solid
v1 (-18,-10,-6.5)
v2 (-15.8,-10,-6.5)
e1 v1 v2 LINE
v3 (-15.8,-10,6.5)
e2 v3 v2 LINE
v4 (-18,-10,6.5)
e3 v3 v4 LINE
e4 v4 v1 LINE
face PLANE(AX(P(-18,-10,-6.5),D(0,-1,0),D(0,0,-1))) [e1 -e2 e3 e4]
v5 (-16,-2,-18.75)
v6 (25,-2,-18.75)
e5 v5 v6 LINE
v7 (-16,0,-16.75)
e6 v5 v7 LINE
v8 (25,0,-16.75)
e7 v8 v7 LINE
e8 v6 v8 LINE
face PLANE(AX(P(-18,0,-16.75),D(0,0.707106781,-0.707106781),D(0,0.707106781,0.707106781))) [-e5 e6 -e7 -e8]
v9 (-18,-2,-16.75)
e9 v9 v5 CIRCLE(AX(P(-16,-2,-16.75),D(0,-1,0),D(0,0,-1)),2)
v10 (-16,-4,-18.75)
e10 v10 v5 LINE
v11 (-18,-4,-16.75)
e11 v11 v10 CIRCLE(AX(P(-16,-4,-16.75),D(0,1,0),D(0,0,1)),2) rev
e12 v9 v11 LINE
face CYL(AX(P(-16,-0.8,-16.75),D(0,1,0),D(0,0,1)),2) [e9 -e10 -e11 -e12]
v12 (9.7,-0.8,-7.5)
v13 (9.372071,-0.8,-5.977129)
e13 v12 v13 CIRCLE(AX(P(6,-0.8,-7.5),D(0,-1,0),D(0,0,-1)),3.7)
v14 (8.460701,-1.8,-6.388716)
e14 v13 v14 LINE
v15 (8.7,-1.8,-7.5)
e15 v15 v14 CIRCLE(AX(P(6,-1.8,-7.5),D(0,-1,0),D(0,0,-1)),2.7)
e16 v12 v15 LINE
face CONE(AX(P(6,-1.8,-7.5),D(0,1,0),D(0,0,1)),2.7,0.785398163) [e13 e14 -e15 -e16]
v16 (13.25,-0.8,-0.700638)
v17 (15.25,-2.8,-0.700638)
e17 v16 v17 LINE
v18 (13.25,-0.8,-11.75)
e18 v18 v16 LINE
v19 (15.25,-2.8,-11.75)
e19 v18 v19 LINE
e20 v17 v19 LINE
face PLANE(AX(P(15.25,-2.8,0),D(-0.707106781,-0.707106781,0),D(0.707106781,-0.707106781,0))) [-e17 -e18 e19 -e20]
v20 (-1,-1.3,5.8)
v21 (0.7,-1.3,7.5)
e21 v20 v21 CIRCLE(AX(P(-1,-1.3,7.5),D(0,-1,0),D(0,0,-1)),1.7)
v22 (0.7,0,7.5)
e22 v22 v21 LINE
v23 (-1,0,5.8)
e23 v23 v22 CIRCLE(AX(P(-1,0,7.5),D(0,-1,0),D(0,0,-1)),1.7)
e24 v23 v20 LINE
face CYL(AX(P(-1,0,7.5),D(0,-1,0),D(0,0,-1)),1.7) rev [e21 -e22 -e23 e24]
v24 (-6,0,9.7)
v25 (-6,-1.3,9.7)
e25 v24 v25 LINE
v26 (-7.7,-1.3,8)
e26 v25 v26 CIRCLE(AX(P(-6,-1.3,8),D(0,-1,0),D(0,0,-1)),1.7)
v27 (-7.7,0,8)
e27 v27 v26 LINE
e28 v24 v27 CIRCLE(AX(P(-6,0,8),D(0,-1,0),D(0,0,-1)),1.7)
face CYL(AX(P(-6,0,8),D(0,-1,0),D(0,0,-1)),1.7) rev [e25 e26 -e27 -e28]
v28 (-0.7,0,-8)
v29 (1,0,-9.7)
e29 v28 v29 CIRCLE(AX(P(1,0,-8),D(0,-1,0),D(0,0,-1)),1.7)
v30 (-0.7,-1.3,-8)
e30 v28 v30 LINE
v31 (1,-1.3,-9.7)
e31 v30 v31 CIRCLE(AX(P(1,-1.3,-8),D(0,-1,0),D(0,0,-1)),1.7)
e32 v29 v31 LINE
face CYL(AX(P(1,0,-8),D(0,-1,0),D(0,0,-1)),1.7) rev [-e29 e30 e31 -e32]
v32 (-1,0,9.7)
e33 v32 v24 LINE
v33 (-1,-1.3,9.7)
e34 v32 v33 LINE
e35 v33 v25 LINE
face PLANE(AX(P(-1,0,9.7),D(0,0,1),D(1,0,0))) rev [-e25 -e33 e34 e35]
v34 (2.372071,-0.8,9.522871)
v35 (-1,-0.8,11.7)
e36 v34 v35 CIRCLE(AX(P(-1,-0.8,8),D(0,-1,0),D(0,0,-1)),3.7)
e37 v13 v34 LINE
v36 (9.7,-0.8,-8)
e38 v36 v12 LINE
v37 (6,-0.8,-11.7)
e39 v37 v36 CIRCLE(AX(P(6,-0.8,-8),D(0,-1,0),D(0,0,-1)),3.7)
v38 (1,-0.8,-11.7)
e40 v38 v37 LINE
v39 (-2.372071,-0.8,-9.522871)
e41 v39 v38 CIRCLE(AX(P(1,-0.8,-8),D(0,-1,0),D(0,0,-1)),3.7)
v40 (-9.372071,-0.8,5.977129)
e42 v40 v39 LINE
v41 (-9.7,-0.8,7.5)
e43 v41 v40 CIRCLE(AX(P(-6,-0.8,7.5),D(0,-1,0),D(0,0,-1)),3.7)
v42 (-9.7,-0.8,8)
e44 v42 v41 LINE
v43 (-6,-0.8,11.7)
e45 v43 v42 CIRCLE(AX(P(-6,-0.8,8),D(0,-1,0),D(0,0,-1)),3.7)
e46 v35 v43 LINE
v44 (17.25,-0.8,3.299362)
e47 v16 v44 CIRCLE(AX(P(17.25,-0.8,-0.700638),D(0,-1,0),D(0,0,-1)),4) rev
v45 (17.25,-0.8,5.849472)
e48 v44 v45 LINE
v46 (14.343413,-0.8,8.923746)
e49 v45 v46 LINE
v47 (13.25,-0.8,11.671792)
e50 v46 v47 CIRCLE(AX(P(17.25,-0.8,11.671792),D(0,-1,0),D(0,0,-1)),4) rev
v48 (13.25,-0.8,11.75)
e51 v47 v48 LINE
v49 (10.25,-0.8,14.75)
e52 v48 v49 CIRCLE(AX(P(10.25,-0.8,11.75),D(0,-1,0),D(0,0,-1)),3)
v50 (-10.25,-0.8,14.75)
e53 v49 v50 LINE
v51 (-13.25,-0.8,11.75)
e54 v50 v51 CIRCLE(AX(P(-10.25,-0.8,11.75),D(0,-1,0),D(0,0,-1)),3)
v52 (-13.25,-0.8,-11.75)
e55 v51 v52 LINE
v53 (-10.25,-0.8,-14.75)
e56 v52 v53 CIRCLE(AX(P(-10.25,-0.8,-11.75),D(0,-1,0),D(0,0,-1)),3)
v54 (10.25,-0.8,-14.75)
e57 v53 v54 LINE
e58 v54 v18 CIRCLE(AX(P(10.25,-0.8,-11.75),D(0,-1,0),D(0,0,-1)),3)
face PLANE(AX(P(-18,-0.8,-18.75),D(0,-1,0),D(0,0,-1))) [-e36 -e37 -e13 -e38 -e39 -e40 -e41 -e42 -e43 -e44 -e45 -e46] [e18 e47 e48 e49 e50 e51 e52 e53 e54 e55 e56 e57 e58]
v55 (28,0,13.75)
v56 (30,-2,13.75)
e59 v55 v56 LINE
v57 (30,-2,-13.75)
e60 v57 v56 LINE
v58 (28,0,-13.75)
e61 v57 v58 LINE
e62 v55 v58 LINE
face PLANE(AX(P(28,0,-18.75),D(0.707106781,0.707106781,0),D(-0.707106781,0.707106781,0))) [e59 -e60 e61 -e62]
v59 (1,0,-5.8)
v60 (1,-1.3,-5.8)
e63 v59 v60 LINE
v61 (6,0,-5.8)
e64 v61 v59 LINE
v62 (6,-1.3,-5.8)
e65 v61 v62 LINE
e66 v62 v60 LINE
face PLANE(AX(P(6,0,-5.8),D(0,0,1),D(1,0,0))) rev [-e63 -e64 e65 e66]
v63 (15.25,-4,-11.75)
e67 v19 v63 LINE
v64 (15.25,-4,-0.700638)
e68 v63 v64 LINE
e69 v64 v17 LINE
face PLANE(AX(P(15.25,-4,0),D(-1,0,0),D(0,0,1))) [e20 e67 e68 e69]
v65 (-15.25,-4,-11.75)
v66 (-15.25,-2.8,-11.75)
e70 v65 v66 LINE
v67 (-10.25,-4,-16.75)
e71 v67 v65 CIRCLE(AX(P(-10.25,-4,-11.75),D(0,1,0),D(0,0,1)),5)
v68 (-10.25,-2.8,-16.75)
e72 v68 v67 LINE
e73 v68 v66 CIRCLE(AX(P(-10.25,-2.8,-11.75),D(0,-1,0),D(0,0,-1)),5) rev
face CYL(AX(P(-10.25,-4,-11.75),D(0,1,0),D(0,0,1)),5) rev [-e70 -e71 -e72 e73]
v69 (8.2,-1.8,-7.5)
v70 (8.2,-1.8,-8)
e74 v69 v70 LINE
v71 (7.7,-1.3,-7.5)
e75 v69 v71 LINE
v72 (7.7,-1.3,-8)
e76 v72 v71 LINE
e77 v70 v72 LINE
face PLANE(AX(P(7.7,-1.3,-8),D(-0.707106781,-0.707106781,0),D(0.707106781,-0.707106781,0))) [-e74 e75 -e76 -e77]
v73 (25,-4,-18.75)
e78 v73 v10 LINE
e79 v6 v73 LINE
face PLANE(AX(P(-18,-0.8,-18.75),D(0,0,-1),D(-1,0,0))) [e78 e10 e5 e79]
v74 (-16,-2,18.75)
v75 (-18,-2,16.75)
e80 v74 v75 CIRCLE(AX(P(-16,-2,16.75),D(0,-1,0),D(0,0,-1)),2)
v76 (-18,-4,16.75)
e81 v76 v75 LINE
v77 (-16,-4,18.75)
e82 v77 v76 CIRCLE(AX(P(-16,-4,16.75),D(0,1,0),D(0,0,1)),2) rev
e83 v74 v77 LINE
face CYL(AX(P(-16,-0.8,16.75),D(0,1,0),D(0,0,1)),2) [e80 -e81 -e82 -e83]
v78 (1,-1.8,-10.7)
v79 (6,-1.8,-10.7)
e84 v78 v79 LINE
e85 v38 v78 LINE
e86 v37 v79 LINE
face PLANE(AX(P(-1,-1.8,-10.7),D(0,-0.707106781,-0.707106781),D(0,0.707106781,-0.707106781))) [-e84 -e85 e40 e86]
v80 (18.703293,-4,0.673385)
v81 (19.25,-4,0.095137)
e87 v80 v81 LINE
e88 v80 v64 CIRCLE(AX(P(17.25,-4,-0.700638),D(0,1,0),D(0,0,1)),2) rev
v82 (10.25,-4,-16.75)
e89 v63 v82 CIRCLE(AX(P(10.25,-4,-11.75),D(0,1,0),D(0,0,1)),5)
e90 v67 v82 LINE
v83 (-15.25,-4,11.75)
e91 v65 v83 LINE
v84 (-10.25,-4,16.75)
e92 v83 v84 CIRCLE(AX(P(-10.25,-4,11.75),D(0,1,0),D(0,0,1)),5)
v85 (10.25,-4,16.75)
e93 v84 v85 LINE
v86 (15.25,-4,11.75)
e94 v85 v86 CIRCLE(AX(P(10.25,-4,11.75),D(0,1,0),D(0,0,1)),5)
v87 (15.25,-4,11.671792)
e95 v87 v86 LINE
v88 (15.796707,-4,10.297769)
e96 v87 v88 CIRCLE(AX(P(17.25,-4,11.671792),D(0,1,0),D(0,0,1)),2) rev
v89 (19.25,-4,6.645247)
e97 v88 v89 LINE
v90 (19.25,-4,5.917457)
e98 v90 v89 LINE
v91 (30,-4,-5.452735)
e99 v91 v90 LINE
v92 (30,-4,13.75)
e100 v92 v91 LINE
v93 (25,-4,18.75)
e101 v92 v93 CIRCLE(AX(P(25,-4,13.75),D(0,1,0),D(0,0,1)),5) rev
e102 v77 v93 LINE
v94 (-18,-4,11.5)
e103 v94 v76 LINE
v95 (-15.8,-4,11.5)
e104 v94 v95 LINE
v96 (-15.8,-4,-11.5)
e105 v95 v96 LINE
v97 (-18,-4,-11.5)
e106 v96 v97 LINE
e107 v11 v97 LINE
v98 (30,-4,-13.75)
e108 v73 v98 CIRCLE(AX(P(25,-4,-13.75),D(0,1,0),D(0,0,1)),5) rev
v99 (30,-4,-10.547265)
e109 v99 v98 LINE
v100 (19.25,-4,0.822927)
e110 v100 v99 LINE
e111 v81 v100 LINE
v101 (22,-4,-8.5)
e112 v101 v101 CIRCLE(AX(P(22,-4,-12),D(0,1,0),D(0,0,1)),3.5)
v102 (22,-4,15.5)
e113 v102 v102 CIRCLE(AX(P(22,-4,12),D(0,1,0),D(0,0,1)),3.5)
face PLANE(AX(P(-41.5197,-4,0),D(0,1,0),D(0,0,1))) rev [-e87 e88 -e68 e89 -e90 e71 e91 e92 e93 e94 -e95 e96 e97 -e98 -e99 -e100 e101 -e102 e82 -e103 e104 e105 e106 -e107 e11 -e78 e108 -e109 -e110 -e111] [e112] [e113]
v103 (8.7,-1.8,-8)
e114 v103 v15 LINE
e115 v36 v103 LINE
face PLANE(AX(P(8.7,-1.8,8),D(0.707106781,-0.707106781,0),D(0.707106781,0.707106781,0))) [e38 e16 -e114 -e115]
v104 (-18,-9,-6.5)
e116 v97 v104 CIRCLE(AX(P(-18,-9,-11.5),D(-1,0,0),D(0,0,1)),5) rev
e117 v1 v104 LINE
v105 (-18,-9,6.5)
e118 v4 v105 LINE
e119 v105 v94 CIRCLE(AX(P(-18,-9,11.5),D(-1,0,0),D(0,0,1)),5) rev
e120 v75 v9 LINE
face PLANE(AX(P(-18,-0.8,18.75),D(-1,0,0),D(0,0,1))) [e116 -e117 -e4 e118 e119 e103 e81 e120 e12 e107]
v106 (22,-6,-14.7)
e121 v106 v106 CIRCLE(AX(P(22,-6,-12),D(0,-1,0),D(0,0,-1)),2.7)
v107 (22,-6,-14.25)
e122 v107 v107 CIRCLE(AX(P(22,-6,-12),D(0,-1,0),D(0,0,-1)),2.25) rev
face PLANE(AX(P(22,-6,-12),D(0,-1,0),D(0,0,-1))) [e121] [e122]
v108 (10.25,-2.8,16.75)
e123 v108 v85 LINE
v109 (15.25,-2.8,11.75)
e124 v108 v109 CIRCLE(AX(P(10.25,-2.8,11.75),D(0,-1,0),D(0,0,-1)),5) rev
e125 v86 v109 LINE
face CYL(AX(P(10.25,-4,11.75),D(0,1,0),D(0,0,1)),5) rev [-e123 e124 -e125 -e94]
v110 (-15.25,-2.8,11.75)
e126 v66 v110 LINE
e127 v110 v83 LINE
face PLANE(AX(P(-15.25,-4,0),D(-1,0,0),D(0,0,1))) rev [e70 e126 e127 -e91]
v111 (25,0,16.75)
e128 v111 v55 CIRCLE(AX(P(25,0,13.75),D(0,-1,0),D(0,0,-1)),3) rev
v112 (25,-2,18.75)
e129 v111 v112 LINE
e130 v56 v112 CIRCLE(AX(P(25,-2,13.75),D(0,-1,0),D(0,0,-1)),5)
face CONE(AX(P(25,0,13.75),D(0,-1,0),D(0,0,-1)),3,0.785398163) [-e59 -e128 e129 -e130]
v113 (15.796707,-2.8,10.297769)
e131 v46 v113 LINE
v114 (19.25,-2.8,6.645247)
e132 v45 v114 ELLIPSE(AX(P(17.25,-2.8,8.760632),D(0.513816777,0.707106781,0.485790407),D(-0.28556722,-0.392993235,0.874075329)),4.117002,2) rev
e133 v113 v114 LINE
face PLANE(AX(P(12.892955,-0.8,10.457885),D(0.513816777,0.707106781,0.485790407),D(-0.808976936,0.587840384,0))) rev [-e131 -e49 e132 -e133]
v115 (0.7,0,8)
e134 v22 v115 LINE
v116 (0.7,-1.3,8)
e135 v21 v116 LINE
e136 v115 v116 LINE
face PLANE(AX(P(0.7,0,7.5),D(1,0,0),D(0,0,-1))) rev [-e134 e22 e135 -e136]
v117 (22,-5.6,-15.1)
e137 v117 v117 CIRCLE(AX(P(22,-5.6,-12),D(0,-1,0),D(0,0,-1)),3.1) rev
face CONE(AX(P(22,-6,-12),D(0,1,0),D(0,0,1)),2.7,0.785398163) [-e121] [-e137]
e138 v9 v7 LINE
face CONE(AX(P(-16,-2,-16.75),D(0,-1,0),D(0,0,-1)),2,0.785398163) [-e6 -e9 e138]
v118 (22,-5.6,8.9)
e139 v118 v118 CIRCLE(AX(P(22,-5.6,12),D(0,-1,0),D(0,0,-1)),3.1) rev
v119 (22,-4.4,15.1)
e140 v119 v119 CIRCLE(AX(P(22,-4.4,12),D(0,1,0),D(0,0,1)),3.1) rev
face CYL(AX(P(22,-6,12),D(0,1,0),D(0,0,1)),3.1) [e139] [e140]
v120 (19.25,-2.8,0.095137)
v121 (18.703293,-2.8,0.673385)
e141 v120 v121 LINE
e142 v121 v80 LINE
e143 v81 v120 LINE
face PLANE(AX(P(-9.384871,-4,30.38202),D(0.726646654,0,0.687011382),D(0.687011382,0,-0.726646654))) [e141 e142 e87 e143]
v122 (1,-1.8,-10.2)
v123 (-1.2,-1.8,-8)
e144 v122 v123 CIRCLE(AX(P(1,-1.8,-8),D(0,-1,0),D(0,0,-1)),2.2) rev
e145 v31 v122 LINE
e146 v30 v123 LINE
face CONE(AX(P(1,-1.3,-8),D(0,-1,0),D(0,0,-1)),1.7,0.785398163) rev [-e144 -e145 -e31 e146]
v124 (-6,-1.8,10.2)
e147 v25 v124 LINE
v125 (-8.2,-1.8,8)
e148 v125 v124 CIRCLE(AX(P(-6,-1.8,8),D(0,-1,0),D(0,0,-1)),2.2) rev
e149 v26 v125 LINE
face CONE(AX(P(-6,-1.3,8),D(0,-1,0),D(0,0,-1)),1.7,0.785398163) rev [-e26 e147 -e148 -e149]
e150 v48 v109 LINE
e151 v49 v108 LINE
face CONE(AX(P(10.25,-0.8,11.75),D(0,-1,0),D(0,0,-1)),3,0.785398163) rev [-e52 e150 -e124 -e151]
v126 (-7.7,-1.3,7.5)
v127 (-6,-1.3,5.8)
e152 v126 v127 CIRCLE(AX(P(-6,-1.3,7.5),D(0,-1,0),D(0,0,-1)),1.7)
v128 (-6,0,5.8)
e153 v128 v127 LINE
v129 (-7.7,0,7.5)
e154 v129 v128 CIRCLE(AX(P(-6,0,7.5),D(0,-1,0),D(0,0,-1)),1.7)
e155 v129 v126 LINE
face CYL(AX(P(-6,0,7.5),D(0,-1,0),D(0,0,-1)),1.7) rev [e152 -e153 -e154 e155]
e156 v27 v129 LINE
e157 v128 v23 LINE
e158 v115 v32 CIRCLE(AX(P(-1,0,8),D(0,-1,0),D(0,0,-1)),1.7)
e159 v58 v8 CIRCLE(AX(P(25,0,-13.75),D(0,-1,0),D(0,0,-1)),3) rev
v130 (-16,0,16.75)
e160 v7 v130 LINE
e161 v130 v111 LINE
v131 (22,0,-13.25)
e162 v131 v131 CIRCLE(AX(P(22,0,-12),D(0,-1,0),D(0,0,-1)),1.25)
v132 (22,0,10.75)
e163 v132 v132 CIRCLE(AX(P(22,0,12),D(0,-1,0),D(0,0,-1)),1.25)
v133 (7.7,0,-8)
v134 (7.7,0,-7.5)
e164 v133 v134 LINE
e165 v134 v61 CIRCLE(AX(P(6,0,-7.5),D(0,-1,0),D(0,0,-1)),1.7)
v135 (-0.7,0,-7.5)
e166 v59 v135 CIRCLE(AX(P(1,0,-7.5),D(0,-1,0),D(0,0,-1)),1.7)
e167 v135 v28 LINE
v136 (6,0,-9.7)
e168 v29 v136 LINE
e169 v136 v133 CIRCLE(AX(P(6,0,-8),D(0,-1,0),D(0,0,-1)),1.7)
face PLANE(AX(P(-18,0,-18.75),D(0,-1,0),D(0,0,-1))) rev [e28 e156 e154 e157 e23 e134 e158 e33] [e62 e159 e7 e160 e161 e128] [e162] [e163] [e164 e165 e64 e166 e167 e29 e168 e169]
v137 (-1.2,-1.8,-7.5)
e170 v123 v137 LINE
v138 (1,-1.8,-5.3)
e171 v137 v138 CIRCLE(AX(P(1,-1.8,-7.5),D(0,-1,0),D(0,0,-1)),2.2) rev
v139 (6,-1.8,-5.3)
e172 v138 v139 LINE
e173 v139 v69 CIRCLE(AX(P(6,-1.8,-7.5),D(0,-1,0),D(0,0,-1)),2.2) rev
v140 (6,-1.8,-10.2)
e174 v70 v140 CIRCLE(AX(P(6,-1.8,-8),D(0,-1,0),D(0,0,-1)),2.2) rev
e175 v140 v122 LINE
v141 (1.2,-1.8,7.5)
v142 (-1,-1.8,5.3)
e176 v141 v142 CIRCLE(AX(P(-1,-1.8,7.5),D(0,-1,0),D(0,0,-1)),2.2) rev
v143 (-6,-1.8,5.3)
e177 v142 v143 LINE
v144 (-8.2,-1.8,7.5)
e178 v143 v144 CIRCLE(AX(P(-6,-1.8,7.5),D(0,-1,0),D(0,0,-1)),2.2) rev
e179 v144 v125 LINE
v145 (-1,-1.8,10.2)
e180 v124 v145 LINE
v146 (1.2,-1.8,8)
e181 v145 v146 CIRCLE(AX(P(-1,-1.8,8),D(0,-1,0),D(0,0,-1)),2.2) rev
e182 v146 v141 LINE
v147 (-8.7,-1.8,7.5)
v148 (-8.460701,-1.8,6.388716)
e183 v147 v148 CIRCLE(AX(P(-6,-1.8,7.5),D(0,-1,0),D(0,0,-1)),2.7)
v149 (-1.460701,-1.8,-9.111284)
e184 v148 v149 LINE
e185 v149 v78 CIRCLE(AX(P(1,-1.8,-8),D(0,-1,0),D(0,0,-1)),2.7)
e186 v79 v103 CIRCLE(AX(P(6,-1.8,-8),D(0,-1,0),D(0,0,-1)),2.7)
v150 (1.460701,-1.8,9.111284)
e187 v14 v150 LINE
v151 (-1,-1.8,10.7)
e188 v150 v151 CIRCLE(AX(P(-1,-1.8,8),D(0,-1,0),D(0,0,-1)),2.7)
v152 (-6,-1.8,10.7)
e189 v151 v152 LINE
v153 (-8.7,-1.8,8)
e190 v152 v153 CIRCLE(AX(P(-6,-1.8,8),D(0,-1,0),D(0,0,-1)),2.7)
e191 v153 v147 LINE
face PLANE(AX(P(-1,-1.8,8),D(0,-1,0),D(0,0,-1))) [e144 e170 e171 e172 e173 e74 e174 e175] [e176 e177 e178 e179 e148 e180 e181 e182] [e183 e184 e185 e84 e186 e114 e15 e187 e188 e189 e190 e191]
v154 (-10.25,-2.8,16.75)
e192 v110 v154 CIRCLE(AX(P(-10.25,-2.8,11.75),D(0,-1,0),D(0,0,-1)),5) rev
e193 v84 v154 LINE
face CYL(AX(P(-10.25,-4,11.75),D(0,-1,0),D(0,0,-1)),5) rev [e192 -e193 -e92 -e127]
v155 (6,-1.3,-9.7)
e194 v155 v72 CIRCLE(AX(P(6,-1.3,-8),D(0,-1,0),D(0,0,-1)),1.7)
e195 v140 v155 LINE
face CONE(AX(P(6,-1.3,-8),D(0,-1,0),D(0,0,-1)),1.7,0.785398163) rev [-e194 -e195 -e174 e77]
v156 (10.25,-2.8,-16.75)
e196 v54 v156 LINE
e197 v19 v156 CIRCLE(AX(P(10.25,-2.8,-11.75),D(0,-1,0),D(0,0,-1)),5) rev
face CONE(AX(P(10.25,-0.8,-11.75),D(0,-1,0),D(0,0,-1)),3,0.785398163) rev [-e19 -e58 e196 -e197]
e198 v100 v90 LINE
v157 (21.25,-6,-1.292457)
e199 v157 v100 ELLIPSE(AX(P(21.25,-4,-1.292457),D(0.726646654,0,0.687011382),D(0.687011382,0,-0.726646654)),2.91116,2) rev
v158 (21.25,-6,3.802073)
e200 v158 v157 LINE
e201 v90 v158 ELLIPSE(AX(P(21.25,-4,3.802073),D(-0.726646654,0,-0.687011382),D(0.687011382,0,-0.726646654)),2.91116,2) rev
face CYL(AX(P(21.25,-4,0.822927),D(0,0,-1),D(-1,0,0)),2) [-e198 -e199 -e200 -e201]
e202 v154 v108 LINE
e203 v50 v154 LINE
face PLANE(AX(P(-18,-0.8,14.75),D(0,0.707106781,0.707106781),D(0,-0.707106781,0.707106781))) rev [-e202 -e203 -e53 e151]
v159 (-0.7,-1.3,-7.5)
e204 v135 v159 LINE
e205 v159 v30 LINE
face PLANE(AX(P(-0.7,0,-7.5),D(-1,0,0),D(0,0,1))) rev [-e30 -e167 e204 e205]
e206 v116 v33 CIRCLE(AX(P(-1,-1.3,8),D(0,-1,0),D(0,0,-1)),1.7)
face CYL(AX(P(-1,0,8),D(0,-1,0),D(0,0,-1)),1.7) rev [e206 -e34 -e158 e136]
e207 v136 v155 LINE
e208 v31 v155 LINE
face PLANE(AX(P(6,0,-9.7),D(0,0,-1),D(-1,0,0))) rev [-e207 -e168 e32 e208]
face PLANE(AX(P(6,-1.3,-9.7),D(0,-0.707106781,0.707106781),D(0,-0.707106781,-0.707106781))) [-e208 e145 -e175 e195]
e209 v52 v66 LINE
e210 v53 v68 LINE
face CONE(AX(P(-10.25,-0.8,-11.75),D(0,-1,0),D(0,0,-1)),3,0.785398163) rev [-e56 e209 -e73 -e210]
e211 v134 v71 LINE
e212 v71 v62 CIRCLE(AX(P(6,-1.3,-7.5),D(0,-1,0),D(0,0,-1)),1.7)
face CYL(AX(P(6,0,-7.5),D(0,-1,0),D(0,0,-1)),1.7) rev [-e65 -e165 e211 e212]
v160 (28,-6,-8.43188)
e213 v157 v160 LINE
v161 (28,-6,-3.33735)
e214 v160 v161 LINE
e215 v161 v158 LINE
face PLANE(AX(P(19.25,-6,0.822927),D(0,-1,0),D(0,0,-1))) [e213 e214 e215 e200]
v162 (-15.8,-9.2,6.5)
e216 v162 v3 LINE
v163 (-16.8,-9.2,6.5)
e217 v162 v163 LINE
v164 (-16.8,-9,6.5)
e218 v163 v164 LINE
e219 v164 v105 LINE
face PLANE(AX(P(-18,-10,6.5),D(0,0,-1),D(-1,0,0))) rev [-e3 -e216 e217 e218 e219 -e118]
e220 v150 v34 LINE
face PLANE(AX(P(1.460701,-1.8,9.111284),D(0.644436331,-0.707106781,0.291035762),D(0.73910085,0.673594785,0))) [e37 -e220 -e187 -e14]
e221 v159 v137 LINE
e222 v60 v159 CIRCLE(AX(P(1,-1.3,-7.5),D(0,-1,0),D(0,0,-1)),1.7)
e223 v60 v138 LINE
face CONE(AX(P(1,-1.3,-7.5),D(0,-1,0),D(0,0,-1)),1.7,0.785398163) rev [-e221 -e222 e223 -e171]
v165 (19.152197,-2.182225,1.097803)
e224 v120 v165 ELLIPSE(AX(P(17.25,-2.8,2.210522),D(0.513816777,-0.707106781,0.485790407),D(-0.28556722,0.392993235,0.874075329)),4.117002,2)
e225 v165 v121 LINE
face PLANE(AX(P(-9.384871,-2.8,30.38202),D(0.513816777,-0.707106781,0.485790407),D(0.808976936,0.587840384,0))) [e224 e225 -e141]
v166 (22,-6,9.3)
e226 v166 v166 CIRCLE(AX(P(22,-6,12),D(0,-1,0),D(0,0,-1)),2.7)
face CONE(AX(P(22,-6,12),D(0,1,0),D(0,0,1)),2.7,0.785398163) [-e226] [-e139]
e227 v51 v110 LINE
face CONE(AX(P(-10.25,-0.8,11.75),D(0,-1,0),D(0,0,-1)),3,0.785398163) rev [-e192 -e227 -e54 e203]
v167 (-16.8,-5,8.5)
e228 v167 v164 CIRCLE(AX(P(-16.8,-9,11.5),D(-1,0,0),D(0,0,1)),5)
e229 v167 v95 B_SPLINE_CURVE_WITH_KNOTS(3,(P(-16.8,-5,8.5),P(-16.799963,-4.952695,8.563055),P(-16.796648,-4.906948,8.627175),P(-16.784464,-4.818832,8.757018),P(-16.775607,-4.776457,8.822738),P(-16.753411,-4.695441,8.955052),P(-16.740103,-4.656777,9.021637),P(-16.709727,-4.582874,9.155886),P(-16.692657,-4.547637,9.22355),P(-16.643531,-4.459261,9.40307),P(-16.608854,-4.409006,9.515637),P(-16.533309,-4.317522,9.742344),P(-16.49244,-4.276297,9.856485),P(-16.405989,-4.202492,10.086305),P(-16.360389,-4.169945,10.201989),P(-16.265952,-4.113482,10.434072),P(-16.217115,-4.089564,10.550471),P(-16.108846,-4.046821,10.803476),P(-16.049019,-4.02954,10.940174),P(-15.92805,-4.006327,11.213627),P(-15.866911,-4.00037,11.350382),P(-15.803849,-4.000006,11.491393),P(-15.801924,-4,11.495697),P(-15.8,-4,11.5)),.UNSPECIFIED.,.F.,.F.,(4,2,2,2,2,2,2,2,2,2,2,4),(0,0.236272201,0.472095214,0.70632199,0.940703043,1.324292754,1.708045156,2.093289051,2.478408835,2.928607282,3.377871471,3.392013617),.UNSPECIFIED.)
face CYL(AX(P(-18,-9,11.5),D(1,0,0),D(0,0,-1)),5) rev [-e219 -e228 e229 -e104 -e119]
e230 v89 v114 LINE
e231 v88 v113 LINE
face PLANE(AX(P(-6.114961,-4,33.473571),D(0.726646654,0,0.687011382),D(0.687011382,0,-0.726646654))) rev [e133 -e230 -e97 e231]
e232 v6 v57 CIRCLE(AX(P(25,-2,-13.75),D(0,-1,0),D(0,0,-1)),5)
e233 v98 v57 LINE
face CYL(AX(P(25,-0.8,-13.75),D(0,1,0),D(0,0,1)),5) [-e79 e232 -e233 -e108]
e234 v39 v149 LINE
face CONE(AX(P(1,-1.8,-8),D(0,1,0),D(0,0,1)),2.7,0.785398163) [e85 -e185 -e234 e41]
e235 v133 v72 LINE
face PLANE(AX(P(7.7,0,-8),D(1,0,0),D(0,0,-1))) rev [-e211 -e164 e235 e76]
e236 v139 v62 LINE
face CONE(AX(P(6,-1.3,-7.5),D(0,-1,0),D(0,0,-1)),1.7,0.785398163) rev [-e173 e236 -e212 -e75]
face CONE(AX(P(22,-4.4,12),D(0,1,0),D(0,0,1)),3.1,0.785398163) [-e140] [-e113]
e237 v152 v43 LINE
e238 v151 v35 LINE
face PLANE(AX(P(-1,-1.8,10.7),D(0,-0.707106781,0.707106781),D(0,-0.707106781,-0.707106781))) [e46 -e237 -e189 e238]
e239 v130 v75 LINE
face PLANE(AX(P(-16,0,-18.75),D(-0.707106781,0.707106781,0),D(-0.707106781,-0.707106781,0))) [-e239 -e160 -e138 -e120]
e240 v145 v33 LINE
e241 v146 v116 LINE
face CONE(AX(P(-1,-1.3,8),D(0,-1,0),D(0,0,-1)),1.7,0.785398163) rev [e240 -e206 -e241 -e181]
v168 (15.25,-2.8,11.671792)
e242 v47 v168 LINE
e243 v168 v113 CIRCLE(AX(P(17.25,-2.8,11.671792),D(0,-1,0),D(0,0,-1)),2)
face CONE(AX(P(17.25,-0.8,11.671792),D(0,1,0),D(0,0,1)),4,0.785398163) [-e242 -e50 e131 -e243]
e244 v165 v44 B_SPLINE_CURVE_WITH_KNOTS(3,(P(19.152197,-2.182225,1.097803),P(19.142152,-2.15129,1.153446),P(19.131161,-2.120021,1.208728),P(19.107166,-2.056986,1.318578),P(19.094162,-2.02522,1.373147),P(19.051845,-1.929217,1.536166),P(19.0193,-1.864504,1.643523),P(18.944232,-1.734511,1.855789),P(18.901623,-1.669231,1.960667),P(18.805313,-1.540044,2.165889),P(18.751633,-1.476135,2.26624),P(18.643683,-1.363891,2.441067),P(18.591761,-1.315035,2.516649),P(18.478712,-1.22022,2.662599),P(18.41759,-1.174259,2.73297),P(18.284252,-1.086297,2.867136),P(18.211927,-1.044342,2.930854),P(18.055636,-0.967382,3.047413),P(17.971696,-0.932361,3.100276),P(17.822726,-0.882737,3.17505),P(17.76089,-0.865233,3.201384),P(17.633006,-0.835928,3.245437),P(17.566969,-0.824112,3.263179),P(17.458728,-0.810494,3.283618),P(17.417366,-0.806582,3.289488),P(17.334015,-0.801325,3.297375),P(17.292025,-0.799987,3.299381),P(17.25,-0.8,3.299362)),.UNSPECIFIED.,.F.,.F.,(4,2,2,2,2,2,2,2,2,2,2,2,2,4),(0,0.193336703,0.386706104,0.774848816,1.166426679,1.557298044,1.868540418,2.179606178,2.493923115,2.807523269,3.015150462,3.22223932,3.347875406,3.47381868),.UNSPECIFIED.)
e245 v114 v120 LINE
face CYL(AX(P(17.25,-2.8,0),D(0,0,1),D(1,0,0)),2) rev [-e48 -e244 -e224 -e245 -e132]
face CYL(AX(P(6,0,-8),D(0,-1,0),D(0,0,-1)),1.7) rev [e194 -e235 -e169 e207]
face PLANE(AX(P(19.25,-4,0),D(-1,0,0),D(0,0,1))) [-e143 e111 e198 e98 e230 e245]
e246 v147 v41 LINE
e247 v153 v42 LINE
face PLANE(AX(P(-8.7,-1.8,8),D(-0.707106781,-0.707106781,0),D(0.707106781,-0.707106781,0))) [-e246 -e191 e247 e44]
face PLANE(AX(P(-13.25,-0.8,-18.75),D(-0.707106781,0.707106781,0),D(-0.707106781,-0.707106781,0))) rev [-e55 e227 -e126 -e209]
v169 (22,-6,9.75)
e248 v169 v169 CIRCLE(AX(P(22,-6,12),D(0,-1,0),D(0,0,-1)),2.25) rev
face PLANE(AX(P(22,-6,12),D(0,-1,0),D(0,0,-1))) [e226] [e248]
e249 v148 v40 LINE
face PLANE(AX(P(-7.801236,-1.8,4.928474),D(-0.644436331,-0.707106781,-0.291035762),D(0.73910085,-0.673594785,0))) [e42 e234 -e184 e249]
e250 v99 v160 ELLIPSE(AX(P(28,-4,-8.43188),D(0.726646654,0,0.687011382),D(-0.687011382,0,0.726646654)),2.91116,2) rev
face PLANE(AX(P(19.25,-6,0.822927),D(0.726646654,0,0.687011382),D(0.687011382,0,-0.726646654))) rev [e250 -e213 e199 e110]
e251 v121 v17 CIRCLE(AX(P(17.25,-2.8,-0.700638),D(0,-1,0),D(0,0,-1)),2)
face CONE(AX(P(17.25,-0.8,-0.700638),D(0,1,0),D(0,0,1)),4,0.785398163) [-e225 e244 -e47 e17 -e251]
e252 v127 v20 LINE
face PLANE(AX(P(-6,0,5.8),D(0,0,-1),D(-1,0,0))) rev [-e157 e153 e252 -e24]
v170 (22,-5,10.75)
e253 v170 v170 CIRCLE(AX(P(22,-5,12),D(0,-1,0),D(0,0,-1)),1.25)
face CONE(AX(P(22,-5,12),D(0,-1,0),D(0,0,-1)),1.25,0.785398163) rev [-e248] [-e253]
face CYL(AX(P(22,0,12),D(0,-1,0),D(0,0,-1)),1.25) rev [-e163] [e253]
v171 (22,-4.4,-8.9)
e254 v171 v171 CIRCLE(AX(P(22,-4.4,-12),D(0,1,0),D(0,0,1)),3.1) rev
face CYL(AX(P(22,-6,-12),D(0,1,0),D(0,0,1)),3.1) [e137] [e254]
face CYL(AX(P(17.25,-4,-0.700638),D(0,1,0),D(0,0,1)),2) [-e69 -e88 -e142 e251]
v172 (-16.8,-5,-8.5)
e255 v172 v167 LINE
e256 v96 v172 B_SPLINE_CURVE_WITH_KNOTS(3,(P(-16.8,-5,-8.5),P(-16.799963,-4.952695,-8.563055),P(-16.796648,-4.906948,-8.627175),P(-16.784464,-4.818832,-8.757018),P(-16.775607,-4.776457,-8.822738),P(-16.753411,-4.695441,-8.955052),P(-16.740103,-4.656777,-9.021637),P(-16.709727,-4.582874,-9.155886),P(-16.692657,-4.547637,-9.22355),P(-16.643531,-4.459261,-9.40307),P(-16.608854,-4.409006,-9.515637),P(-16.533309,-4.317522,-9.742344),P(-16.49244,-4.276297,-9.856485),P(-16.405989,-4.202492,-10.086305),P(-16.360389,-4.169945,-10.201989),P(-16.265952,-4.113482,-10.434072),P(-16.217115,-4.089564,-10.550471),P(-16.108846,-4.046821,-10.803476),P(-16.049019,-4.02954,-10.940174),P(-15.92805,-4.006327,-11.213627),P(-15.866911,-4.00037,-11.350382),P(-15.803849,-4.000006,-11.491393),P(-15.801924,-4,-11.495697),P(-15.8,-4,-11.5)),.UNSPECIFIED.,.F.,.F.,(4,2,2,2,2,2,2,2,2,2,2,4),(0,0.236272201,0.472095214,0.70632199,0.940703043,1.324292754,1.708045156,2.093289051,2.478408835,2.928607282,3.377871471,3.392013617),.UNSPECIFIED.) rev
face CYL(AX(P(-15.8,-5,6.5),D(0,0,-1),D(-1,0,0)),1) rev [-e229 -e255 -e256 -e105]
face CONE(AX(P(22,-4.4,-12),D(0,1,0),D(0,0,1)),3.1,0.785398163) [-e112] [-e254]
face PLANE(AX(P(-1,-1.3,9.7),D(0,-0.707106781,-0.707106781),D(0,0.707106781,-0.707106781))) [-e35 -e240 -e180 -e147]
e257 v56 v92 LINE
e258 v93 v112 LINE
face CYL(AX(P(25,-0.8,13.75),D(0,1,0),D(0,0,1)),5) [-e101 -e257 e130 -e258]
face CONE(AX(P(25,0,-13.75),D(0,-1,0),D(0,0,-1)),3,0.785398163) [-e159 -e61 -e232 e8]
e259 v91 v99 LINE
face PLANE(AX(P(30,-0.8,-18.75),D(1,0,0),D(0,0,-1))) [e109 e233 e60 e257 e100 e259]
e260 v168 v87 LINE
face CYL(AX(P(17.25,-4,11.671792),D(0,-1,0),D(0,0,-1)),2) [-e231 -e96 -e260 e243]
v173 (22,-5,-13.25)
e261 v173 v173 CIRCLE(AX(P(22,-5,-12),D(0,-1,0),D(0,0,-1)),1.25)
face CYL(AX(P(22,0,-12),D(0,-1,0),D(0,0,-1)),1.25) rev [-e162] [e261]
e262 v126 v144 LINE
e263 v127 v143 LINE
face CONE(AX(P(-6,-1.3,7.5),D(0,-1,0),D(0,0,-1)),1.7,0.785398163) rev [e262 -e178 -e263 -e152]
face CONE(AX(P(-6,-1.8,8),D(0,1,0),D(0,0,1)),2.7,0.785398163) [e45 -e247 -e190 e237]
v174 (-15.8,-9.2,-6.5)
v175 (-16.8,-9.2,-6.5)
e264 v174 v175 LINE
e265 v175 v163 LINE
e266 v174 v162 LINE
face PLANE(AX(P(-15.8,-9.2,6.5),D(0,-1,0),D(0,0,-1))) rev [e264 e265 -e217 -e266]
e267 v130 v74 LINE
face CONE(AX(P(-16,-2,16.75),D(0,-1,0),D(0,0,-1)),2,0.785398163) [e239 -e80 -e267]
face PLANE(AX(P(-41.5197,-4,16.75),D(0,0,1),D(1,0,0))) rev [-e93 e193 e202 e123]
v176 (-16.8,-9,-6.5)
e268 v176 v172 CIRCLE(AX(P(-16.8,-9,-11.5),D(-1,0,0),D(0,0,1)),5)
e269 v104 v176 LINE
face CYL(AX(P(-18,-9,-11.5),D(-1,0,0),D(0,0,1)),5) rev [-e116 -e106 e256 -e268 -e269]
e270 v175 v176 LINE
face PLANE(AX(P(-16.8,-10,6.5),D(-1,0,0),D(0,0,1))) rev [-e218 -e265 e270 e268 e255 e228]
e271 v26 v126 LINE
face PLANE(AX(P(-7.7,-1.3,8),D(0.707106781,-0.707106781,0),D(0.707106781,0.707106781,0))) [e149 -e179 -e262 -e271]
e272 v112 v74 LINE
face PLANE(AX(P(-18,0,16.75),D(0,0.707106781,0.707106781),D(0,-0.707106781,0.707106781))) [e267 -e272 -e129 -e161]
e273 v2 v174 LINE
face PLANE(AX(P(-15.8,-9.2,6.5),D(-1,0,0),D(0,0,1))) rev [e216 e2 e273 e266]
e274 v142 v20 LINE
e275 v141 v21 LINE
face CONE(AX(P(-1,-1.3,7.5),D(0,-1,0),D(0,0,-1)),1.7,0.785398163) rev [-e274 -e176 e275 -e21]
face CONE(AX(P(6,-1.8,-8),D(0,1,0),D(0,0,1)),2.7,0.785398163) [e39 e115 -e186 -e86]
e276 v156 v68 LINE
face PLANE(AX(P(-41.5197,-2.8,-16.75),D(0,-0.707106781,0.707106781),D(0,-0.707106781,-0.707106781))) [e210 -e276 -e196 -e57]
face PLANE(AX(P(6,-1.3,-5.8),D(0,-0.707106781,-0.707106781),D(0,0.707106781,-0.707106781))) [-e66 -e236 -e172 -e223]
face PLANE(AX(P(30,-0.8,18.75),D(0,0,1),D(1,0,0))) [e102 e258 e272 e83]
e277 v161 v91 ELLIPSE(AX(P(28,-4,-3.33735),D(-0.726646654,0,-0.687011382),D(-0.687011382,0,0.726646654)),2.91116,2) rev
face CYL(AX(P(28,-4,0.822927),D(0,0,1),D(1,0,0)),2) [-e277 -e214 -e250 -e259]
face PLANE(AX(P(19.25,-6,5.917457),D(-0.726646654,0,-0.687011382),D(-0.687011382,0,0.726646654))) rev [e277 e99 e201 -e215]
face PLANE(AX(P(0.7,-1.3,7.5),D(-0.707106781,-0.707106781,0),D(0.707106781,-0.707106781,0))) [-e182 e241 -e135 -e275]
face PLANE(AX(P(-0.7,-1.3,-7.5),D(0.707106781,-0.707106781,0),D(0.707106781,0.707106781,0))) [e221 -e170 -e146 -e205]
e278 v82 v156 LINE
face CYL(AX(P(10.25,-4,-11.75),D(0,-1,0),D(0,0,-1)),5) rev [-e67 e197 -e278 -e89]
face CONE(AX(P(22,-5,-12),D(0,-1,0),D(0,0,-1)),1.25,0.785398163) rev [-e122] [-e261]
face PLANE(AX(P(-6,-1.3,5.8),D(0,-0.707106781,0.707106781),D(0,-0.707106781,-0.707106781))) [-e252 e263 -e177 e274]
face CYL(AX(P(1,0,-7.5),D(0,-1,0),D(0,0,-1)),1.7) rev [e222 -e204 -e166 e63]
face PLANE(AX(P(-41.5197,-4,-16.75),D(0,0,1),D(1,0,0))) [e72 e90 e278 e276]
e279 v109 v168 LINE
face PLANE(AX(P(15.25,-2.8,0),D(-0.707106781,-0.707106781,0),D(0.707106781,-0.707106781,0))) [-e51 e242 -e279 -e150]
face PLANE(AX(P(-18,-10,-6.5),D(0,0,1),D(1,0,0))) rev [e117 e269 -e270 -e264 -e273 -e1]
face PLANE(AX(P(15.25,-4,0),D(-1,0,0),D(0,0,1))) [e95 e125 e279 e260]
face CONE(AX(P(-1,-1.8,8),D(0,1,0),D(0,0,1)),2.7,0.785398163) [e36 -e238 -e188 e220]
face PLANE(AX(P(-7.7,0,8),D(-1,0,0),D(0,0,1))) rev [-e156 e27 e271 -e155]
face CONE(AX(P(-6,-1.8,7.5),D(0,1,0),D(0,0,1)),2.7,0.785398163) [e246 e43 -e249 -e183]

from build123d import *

# Parameters (mm, degrees)
BOSS_EXTRUDE1_START     = -0.8
BOSS_EXTRUDE1_OUTLINE_W = 48
BOSS_EXTRUDE1_OUTLINE_H = 37.5
BOSS_EXTRUDE1_DEPTH     = 0.8
BOSS_EXTRUDE2_DEPTH     = 4
SKETCH6_R               = 1.25
CUT_EXTRUDE3_DEPTH      = 36.602843988
BOSS_EXTRUDE3_DEPTH     = 2
SKETCH8_W               = 1.2
SKETCH8_H               = 13
BOSS_EXTRUDE4_DEPTH     = 6
SKETCH9_W               = 13
SKETCH9_H               = 0.8
BOSS_EXTRUDE5_DEPTH     = 1
FILLET3_R               = 5
FILLET2_R               = 1
FILLET6_R               = 2
CHAMFER1_SIZE           = 2
FILLET5_R               = 2
BOSS_EXTRUDE6_START     = 2
SKETCH11_R              = 3.1
SKETCH11_R_2            = 1.25
BOSS_EXTRUDE6_DEPTH     = 2
CHAMFER3_SIZE           = 0.4
CHAMFER4_SIZE           = 1
BOSS_EXTRUDE7_START     = 1
BOSS_EXTRUDE7_DEPTH     = 1
CHAMFER5_SIZE           = 1
CHAMFER6_SIZE           = 0.5
FILLET7_R               = 2


# Read off the part's stored shape, not the designer's step: Boss-Extrude1
# Some blends are built 0.0001 mm under size
with BuildPart() as part:
    # Boss-Extrude1 outline → Boss-Extrude1 (new body)
    with BuildSketch(Plane(origin=(0, 0, 0), x_dir=(1, 0, 0), z_dir=(0, 1, 0)).offset(BOSS_EXTRUDE1_START)):
        with Locations((6, 0)):
            Rectangle(BOSS_EXTRUDE1_OUTLINE_W, BOSS_EXTRUDE1_OUTLINE_H)
    extrude(amount=BOSS_EXTRUDE1_DEPTH)

    # Sketch3 → Boss-Extrude2 (add)
    with BuildSketch(Plane(origin=(0, 0, 0), x_dir=(1, 0, 0), z_dir=(0, 1, 0))):
        Polygon((-18, 18.75), (17, 18.75), (30, 18.75), (30, -18.75), (-18, -18.75), align=None)
        Polygon((-15.25, -16.75), (15.25, -16.75), (15.25, -10.876016447), (19.25, -6.645247216), (19.25, -0.095137399), (15.25, -4.32590663), (15.25, 16.75), (-15.25, 16.75), align=None, mode=Mode.SUBTRACT)
    extrude(amount=-BOSS_EXTRUDE2_DEPTH)

    # Sketch6 → Cut-Extrude3 (cut, through all)
    with BuildSketch(Plane(origin=(0, -4, 0), x_dir=(-1, 0, 0), z_dir=(0, -1, 0))):
        with Locations(Location((-22, 12, 0), (0, 0, 90))):
            Circle(SKETCH6_R)
        with Locations(Location((-22, -12, 0), (0, 0, 90))):
            Circle(SKETCH6_R)
        with BuildLine():
            Line((0.7, 7.5), (0.7, 8))
            ThreePointArc((0.7, 8), (0.202081528, 9.202081528), (-1, 9.7))
            Line((-1, 9.7), (-6, 9.7))
            ThreePointArc((-6, 9.7), (-7.202081528, 9.202081528), (-7.7, 8))
            Line((-7.7, 8), (-7.7, 7.5))
            ThreePointArc((-7.7, 7.5), (-7.202081528, 6.297918472), (-6, 5.8))
            Line((-6, 5.8), (-1, 5.8))
            ThreePointArc((-1, 5.8), (0.202081528, 6.297918472), (0.7, 7.5))
        make_face()
        with BuildLine():
            Line((1, -9.7), (6, -9.7))
            ThreePointArc((6, -9.7), (7.202081528, -9.202081528), (7.7, -8))
            Line((7.7, -8), (7.7, -7.5))
            ThreePointArc((7.7, -7.5), (7.202081528, -6.297918472), (6, -5.8))
            Line((6, -5.8), (1, -5.8))
            ThreePointArc((1, -5.8), (-0.202081528, -6.297918472), (-0.7, -7.5))
            Line((-0.7, -7.5), (-0.7, -8))
            ThreePointArc((-0.7, -8), (-0.202081528, -9.202081528), (1, -9.7))
        make_face()
    extrude(amount=-CUT_EXTRUDE3_DEPTH, mode=Mode.SUBTRACT)

    # Sketch7 → Boss-Extrude3 (add)
    with BuildSketch(Plane.XZ.offset(4)):
        Polygon((19.25, 5.917457236), (30, -5.452735071), (30, -10.547264929), (19.25, 0.822927379), align=None)
    extrude(amount=BOSS_EXTRUDE3_DEPTH)

    # Sketch8 → Boss-Extrude4 (add)
    with BuildSketch(Plane.XZ.offset(4)):
        with Locations((-17.4, 0)):
            Rectangle(SKETCH8_W, SKETCH8_H)
    extrude(amount=BOSS_EXTRUDE4_DEPTH)

    # Sketch9 → Boss-Extrude5 (add)
    with BuildSketch(Plane(origin=(-16.8, 0, 0), x_dir=(0, 0, -1), z_dir=(1, 0, 0))):
        with Locations((0, -9.6)):
            Rectangle(SKETCH9_W, SKETCH9_H)
    extrude(amount=BOSS_EXTRUDE5_DEPTH)

    # Fillet3
    fillet3_edges = [part.edges().sort_by_distance(p)[0] for p in [
        (30, -2, -18.75),
        (30, -2, 18.75),
        (15.25, -2.4, -16.75),
        (-15.25, -2.4, -16.75),
        (15.25, -2.4, 16.75),
        (-15.25, -2.4, 16.75),
        (-17.4, -4, 6.5),
        (-17.4, -4, -6.5),
    ]]
    fillet(fillet3_edges, radius=FILLET3_R)

    # Fillet2
    fillet2_edges = [part.edges().sort_by_distance(p)[0] for p in [
        (-16.8, -4, 0),
    ]]
    fillet(fillet2_edges, radius=FILLET2_R)

    # Fillet6
    fillet6_edges = [part.edges().sort_by_distance(p)[0] for p in [
        (15.25, -2.4, 4.32590663),
        (15.25, -2.4, 10.876016447),
        (-18, -2, -18.75),
        (-18, -2, 18.75),
    ]]
    fillet(fillet6_edges, radius=FILLET6_R)

    # Chamfer1
    # the kernel refuses this chamfer: 2 mm, written as the material it adds along each edge
    with BuildSketch(Plane(origin=(10.25, -0.8, -16.75), x_dir=(0, -0.9996219169112968, -0.027495876610585633), z_dir=(-1, 0, 0)), Plane(origin=(-10.25, -0.8, 16.75), x_dir=(0, -0.9996219169112968, 0.027495876610585633), z_dir=(1, 0, 0))) as chamfer1_piece_1:
        with BuildLine():
            Line((2.05734639, 0), (-0.11309431, 2.054235587))
            Line((-0.11309431, 2.054235587), (-0.153079186, 2.053135752))
            ThreePointArc((-0.153079186, 2.053135752), (-0.068258454, 1.026795659), (-0.039984877, -0.001099835))
            Line((-0.039984877, -0.001099835), (0.001099835, -0.039984877))
            ThreePointArc((0.001099835, -0.039984877), (1.028995329, -0.011711299), (2.058446225, -0.039984877))
            Line((2.058446225, -0.039984877), (2.05734639, 0))
        make_face()
    extrude(amount=20.5)
    with BuildSketch(Plane(origin=(15.25, -0.8, 11.75), x_dir=(0.027495876610586497, -0.9996219169112968, 0), z_dir=(0, 0, -1))) as chamfer1_piece_2:
        with BuildLine():
            Line((2.05734639, 0), (-0.11309431, 2.054235587))
            Line((-0.11309431, 2.054235587), (-0.153079186, 2.053135752))
            ThreePointArc((-0.153079186, 2.053135752), (-0.068258454, 1.026795659), (-0.039984877, -0.001099835))
            Line((-0.039984877, -0.001099835), (0.001099835, -0.039984877))
            ThreePointArc((0.001099835, -0.039984877), (1.028995329, -0.011711299), (2.058446225, -0.039984877))
            Line((2.058446225, -0.039984877), (2.05734639, 0))
        make_face()
    extrude(amount=0.07820825)
    with BuildSketch(Plane(origin=(-15.25, -0.8, -11.75), x_dir=(-0.02749587661058736, -0.9996219169112968, 0), z_dir=(0, 0, 1))) as chamfer1_piece_3:
        with BuildLine():
            Line((2.05734639, 0), (-0.11309431, 2.054235587))
            Line((-0.11309431, 2.054235587), (-0.153079186, 2.053135752))
            ThreePointArc((-0.153079186, 2.053135752), (-0.068258454, 1.026795659), (-0.039984877, -0.001099835))
            Line((-0.039984877, -0.001099835), (0.001099835, -0.039984877))
            ThreePointArc((0.001099835, -0.039984877), (1.028995329, -0.011711299), (2.058446225, -0.039984877))
            Line((2.058446225, -0.039984877), (2.05734639, 0))
        make_face()
    extrude(amount=23.5)
    with BuildSketch(Plane(origin=(-10.25, -0.8, 11.75), x_dir=(-1, 0, 0), z_dir=(0, 0, -1))) as chamfer1_piece_4:
        with BuildLine():
            Line((5.056568542, -2.056568542), (2.943431458, 0.056568542))
            Line((2.943431458, 0.056568542), (2.943431458, 0.096568542))
            ThreePointArc((2.943431458, 0.096568542), (3.971715729, 0.04), (5, 0.04))
            Line((5, 0.04), (5.04, 0))
            ThreePointArc((5.04, 0), (5.04, -1.028284271), (5.096568542, -2.056568542))
            Line((5.096568542, -2.056568542), (5.056568542, -2.056568542))
        make_face()
    revolve(axis=Axis((-10.25, -0.8, 11.75), (0, 1, 0)), revolution_arc=90)
    with BuildSketch(Plane(origin=(10.25, -0.8, 11.75), x_dir=(0, 0, 1), z_dir=(-1, 0, 0))) as chamfer1_piece_5:
        with BuildLine():
            Line((5.056568542, -2.056568542), (2.943431458, 0.056568542))
            Line((2.943431458, 0.056568542), (2.943431458, 0.096568542))
            ThreePointArc((2.943431458, 0.096568542), (3.971715729, 0.04), (5, 0.04))
            Line((5, 0.04), (5.04, 0))
            ThreePointArc((5.04, 0), (5.04, -1.028284271), (5.096568542, -2.056568542))
            Line((5.096568542, -2.056568542), (5.056568542, -2.056568542))
        make_face()
    revolve(axis=Axis((10.25, -0.8, 11.75), (0, 1, 0)), revolution_arc=90)
    with BuildSketch(Plane(origin=(-10.25, -0.8, -11.75), x_dir=(0, 0, -1), z_dir=(1, 0, 0))) as chamfer1_piece_6:
        with BuildLine():
            Line((5.056568542, -2.056568542), (2.943431458, 0.056568542))
            Line((2.943431458, 0.056568542), (2.943431458, 0.096568542))
            ThreePointArc((2.943431458, 0.096568542), (3.971715729, 0.04), (5, 0.04))
            Line((5, 0.04), (5.04, 0))
            ThreePointArc((5.04, 0), (5.04, -1.028284271), (5.096568542, -2.056568542))
            Line((5.096568542, -2.056568542), (5.056568542, -2.056568542))
        make_face()
    revolve(axis=Axis((-10.25, -0.8, -11.75), (0, 1, 0)), revolution_arc=90)
    with BuildSketch(Plane(origin=(10.25, -0.8, -11.75), x_dir=(1, 0, 0), z_dir=(0, 0, 1))) as chamfer1_piece_7:
        with BuildLine():
            Line((5.056568542, -2.056568542), (2.943431458, 0.056568542))
            Line((2.943431458, 0.056568542), (2.943431458, 0.096568542))
            ThreePointArc((2.943431458, 0.096568542), (3.971715729, 0.04), (5, 0.04))
            Line((5, 0.04), (5.04, 0))
            ThreePointArc((5.04, 0), (5.04, -1.028284271), (5.096568542, -2.056568542))
            Line((5.096568542, -2.056568542), (5.056568542, -2.056568542))
        make_face()
    revolve(axis=Axis((10.25, -0.8, -11.75), (0, 1, 0)), revolution_arc=90)
    with BuildSketch(Plane(origin=(15.796706691, -0.8, 10.297768985), x_dir=(0.01997978675069661, -0.9996219169112968, 0.018889980200658588), z_dir=(0.6870113824043602, 0, -0.7266466544661511))) as chamfer1_piece_8:
        with BuildLine():
            Line((2.05734639, 0), (-0.11309431, 2.054235587))
            Line((-0.11309431, 2.054235587), (-0.153079186, 2.053135752))
            ThreePointArc((-0.153079186, 2.053135752), (-0.068258454, 1.026795659), (-0.039984877, -0.001099835))
            Line((-0.039984877, -0.001099835), (0.001099835, -0.039984877))
            ThreePointArc((0.001099835, -0.039984877), (1.028995329, -0.011711299), (2.058446225, -0.039984877))
            Line((2.058446225, -0.039984877), (2.05734639, 0))
        make_face()
    extrude(amount=10.16991051)
    with BuildSketch(Plane(origin=(22.783550969, -0.8, -3.64227228), x_dir=(-0.019979786750696504, -0.9996219169112968, -0.018889980200658484), z_dir=(-0.6870113824043601, 0, 0.7266466544661513))) as chamfer1_piece_9:
        with BuildLine():
            Line((2.05734639, 0), (-0.11309431, 2.054235587))
            Line((-0.11309431, 2.054235587), (-0.153079186, 2.053135752))
            ThreePointArc((-0.153079186, 2.053135752), (-0.068258454, 1.026795659), (-0.039984877, -0.001099835))
            Line((-0.039984877, -0.001099835), (0.001099835, -0.039984877))
            ThreePointArc((0.001099835, -0.039984877), (1.028995329, -0.011711299), (2.058446225, -0.039984877))
            Line((2.058446225, -0.039984877), (2.05734639, 0))
        make_face()
    extrude(amount=5.939141279)
    with BuildSketch(Plane(origin=(15.25, -0.8, -0.700637904), x_dir=(0.027495876610585623, -0.9996219169112968, 0), z_dir=(0, 0, -1))) as chamfer1_piece_10:
        with BuildLine():
            Line((2.05734639, 0), (-0.11309431, 2.054235587))
            Line((-0.11309431, 2.054235587), (-0.153079186, 2.053135752))
            ThreePointArc((-0.153079186, 2.053135752), (-0.068258454, 1.026795659), (-0.039984877, -0.001099835))
            Line((-0.039984877, -0.001099835), (0.001099835, -0.039984877))
            ThreePointArc((0.001099835, -0.039984877), (1.028995329, -0.011711299), (2.058446225, -0.039984877))
            Line((2.058446225, -0.039984877), (2.05734639, 0))
        make_face()
    extrude(amount=11.049362096)
    with BuildSketch(Plane(origin=(17.25, -0.8, 11.67179175), x_dir=(-0.7266466544661513, 0, -0.6870113824043599), z_dir=(0.6870113824043599, 0, -0.7266466544661513))) as chamfer1_piece_11:
        with BuildLine():
            Line((1.943431458, -2.056568542), (4.056568542, 0.056568542))
            Line((4.056568542, 0.056568542), (4.056568542, 0.096568542))
            ThreePointArc((4.056568542, 0.096568542), (3.028284271, 0.04), (2, 0.04))
            Line((2, 0.04), (1.96, 0))
            ThreePointArc((1.96, 0), (1.96, -1.028284271), (1.903431458, -2.056568542))
            Line((1.903431458, -2.056568542), (1.943431458, -2.056568542))
        make_face()
    revolve(axis=Axis((17.25, -0.8, 11.67179175), (0, 1, 0)), revolution_arc=43.393997011)
    with BuildSketch(Plane(origin=(17.25, -0.8, -0.700637904), x_dir=(-1, 0, 0), z_dir=(0, 0, -1))) as chamfer1_piece_12:
        with BuildLine():
            Line((1.943431458, -2.056568542), (4.056568542, 0.056568542))
            Line((4.056568542, 0.056568542), (4.056568542, 0.096568542))
            ThreePointArc((4.056568542, 0.096568542), (3.028284271, 0.04), (2, 0.04))
            Line((2, 0.04), (1.96, 0))
            ThreePointArc((1.96, 0), (1.96, -1.028284271), (1.903431458, -2.056568542))
            Line((1.903431458, -2.056568542), (1.943431458, -2.056568542))
        make_face()
    revolve(axis=Axis((17.25, -0.8, -0.700637904), (0, 1, 0)), revolution_arc=136.606002989)
    chamfer1_2_edges = [part.edges().sort_by_distance(p)[0] for p in [
        (30, 0, 0),
        (4.5, 0, -18.75),
        (28.535533906, 0, 17.285533906),
        (28.535533906, 0, -17.285533906),
        (-18, 0, 0),
        (4.5, 0, 18.75),
        (-17.414213562, 0, -18.164213562),
        (-17.414213562, 0, 18.164213562),
    ]]
    chamfer(chamfer1_2_edges, length=CHAMFER1_SIZE)

    # Fillet5
    fillet5_edges = [part.edges().sort_by_distance(p)[0] for p in [
        (19.25, -0.8, 3.248775504),
    ]]
    fillet(fillet5_edges, radius=FILLET5_R)

    # Sketch11 → Boss-Extrude6 (add)
    # profile 1 of 2: a face of its own
    with BuildSketch(Plane.XZ.offset(4).offset(BOSS_EXTRUDE6_START)):
        with Locations(Location((22, -12, 0), (0, 0, 90))):
            Circle(SKETCH11_R)
        with Locations(Location((22, -12, 0), (0, 0, 270))):
            Circle(SKETCH11_R_2, mode=Mode.SUBTRACT)
    # profile 2 of 2: a face of its own
    with BuildSketch(Plane.XZ.offset(4).offset(BOSS_EXTRUDE6_START)):
        with Locations(Location((22, 12, 0), (0, 0, 90))):
            Circle(SKETCH11_R)
        with Locations(Location((22, 12, 0), (0, 0, 270))):
            Circle(SKETCH11_R_2, mode=Mode.SUBTRACT)
    extrude(amount=-BOSS_EXTRUDE6_DEPTH)

    # Chamfer3
    chamfer3_edges = [part.edges().sort_by_distance(p)[0] for p in [
        (22, -4, -15.1),
        (22, -6, -15.1),
        (22, -4, 8.9),
        (22, -6, 8.9),
    ]]
    chamfer(chamfer3_edges, length=CHAMFER3_SIZE)

    # Chamfer4
    chamfer4_edges = [part.edges().sort_by_distance(p)[0] for p in [
        (22, -6, -10.75),
        (22, -6, 13.25),
    ]]
    chamfer(chamfer4_edges, length=CHAMFER4_SIZE)

    # Sketch12 → Boss-Extrude7 (add)
    with BuildSketch(Plane.XZ.offset(0.8).offset(BOSS_EXTRUDE7_START)):
        with BuildLine():
            Line((-1, 11.7), (-6, 11.7))
            ThreePointArc((-6, 11.7), (-8.61629509, 10.61629509), (-9.7, 8))
            Line((-9.7, 8), (-9.7, 7.5))
            ThreePointArc((-9.7, 7.5), (-9.617088851, 6.72111089), (-9.372071219, 5.977129127))
            Line((-9.372071219, 5.977129127), (-2.372071219, -9.522870873))
            ThreePointArc((-2.372071219, -9.522870873), (-1.006910283, -11.108425826), (1, -11.7))
            Line((1, -11.7), (6, -11.7))
            ThreePointArc((6, -11.7), (8.61629509, -10.61629509), (9.7, -8))
            Line((9.7, -8), (9.7, -7.5))
            ThreePointArc((9.7, -7.5), (9.617088851, -6.72111089), (9.372071219, -5.977129127))
            Line((9.372071219, -5.977129127), (2.372071219, 9.522870873))
            ThreePointArc((2.372071219, 9.522870873), (1.006910283, 11.108425826), (-1, 11.7))
        make_face()
        with BuildLine():
            Line((-6, 5.8), (-1, 5.8))
            ThreePointArc((-1, 5.8), (0.202081528, 6.297918472), (0.7, 7.5))
            Line((0.7, 7.5), (0.7, 8))
            ThreePointArc((0.7, 8), (0.202081528, 9.202081528), (-1, 9.7))
            Line((-1, 9.7), (-6, 9.7))
            ThreePointArc((-6, 9.7), (-7.202081528, 9.202081528), (-7.7, 8))
            Line((-7.7, 8), (-7.7, 7.5))
            ThreePointArc((-7.7, 7.5), (-7.202081528, 6.297918472), (-6, 5.8))
        make_face(mode=Mode.SUBTRACT)
        with BuildLine():
            Line((6, -5.8), (1, -5.8))
            ThreePointArc((1, -5.8), (-0.202081528, -6.297918472), (-0.7, -7.5))
            Line((-0.7, -7.5), (-0.7, -8))
            ThreePointArc((-0.7, -8), (-0.202081528, -9.202081528), (1, -9.7))
            Line((1, -9.7), (6, -9.7))
            ThreePointArc((6, -9.7), (7.202081528, -9.202081528), (7.7, -8))
            Line((7.7, -8), (7.7, -7.5))
            ThreePointArc((7.7, -7.5), (7.202081528, -6.297918472), (6, -5.8))
        make_face(mode=Mode.SUBTRACT)
    extrude(amount=-BOSS_EXTRUDE7_DEPTH)

    # Chamfer5
    chamfer5_edges = [part.edges().sort_by_distance(p)[0] for p in [
        (-5.872071219, -1.8, -1.772870873),
        (-1.006910283, -1.8, -11.108425826),
        (-9.617088851, -1.8, 6.72111089),
        (3.5, -1.8, -11.7),
        (-9.7, -1.8, 7.75),
        (8.61629509, -1.8, -10.61629509),
        (-8.61629509, -1.8, 10.61629509),
        (9.7, -1.8, -7.75),
        (-3.5, -1.8, 11.7),
        (9.617088851, -1.8, -6.72111089),
        (1.006910283, -1.8, 11.108425826),
        (5.872071219, -1.8, 1.772870873),
    ]]
    chamfer(chamfer5_edges, length=CHAMFER5_SIZE - 0.0001)  # a hair under: the kernel refuses the full size

    # Chamfer6
    chamfer6_edges = [part.edges().sort_by_distance(p)[0] for p in [
        (-7.202081528, -1.8, 6.297918472),
        (-3.5, -1.8, 5.8),
        (0.202081528, -1.8, 6.297918472),
        (0.7, -1.8, 7.75),
        (0.202081528, -1.8, 9.202081528),
        (-3.5, -1.8, 9.7),
        (-7.202081528, -1.8, 9.202081528),
        (-7.7, -1.8, 7.75),
        (7.202081528, -1.8, -6.297918472),
        (3.5, -1.8, -5.8),
        (-0.202081528, -1.8, -6.297918472),
        (-0.7, -1.8, -7.75),
        (-0.202081528, -1.8, -9.202081528),
        (3.5, -1.8, -9.7),
        (7.202081528, -1.8, -9.202081528),
        (7.7, -1.8, -7.75),
    ]]
    chamfer(chamfer6_edges, length=CHAMFER6_SIZE)

    # Fillet7
    fillet7_edges = [part.edges().sort_by_distance(p)[0] for p in [
        (30, -6, -8),
        (19.25, -6, 3.370192308),
    ]]
    fillet(fillet7_edges, radius=FILLET7_R)


solid = part.part
